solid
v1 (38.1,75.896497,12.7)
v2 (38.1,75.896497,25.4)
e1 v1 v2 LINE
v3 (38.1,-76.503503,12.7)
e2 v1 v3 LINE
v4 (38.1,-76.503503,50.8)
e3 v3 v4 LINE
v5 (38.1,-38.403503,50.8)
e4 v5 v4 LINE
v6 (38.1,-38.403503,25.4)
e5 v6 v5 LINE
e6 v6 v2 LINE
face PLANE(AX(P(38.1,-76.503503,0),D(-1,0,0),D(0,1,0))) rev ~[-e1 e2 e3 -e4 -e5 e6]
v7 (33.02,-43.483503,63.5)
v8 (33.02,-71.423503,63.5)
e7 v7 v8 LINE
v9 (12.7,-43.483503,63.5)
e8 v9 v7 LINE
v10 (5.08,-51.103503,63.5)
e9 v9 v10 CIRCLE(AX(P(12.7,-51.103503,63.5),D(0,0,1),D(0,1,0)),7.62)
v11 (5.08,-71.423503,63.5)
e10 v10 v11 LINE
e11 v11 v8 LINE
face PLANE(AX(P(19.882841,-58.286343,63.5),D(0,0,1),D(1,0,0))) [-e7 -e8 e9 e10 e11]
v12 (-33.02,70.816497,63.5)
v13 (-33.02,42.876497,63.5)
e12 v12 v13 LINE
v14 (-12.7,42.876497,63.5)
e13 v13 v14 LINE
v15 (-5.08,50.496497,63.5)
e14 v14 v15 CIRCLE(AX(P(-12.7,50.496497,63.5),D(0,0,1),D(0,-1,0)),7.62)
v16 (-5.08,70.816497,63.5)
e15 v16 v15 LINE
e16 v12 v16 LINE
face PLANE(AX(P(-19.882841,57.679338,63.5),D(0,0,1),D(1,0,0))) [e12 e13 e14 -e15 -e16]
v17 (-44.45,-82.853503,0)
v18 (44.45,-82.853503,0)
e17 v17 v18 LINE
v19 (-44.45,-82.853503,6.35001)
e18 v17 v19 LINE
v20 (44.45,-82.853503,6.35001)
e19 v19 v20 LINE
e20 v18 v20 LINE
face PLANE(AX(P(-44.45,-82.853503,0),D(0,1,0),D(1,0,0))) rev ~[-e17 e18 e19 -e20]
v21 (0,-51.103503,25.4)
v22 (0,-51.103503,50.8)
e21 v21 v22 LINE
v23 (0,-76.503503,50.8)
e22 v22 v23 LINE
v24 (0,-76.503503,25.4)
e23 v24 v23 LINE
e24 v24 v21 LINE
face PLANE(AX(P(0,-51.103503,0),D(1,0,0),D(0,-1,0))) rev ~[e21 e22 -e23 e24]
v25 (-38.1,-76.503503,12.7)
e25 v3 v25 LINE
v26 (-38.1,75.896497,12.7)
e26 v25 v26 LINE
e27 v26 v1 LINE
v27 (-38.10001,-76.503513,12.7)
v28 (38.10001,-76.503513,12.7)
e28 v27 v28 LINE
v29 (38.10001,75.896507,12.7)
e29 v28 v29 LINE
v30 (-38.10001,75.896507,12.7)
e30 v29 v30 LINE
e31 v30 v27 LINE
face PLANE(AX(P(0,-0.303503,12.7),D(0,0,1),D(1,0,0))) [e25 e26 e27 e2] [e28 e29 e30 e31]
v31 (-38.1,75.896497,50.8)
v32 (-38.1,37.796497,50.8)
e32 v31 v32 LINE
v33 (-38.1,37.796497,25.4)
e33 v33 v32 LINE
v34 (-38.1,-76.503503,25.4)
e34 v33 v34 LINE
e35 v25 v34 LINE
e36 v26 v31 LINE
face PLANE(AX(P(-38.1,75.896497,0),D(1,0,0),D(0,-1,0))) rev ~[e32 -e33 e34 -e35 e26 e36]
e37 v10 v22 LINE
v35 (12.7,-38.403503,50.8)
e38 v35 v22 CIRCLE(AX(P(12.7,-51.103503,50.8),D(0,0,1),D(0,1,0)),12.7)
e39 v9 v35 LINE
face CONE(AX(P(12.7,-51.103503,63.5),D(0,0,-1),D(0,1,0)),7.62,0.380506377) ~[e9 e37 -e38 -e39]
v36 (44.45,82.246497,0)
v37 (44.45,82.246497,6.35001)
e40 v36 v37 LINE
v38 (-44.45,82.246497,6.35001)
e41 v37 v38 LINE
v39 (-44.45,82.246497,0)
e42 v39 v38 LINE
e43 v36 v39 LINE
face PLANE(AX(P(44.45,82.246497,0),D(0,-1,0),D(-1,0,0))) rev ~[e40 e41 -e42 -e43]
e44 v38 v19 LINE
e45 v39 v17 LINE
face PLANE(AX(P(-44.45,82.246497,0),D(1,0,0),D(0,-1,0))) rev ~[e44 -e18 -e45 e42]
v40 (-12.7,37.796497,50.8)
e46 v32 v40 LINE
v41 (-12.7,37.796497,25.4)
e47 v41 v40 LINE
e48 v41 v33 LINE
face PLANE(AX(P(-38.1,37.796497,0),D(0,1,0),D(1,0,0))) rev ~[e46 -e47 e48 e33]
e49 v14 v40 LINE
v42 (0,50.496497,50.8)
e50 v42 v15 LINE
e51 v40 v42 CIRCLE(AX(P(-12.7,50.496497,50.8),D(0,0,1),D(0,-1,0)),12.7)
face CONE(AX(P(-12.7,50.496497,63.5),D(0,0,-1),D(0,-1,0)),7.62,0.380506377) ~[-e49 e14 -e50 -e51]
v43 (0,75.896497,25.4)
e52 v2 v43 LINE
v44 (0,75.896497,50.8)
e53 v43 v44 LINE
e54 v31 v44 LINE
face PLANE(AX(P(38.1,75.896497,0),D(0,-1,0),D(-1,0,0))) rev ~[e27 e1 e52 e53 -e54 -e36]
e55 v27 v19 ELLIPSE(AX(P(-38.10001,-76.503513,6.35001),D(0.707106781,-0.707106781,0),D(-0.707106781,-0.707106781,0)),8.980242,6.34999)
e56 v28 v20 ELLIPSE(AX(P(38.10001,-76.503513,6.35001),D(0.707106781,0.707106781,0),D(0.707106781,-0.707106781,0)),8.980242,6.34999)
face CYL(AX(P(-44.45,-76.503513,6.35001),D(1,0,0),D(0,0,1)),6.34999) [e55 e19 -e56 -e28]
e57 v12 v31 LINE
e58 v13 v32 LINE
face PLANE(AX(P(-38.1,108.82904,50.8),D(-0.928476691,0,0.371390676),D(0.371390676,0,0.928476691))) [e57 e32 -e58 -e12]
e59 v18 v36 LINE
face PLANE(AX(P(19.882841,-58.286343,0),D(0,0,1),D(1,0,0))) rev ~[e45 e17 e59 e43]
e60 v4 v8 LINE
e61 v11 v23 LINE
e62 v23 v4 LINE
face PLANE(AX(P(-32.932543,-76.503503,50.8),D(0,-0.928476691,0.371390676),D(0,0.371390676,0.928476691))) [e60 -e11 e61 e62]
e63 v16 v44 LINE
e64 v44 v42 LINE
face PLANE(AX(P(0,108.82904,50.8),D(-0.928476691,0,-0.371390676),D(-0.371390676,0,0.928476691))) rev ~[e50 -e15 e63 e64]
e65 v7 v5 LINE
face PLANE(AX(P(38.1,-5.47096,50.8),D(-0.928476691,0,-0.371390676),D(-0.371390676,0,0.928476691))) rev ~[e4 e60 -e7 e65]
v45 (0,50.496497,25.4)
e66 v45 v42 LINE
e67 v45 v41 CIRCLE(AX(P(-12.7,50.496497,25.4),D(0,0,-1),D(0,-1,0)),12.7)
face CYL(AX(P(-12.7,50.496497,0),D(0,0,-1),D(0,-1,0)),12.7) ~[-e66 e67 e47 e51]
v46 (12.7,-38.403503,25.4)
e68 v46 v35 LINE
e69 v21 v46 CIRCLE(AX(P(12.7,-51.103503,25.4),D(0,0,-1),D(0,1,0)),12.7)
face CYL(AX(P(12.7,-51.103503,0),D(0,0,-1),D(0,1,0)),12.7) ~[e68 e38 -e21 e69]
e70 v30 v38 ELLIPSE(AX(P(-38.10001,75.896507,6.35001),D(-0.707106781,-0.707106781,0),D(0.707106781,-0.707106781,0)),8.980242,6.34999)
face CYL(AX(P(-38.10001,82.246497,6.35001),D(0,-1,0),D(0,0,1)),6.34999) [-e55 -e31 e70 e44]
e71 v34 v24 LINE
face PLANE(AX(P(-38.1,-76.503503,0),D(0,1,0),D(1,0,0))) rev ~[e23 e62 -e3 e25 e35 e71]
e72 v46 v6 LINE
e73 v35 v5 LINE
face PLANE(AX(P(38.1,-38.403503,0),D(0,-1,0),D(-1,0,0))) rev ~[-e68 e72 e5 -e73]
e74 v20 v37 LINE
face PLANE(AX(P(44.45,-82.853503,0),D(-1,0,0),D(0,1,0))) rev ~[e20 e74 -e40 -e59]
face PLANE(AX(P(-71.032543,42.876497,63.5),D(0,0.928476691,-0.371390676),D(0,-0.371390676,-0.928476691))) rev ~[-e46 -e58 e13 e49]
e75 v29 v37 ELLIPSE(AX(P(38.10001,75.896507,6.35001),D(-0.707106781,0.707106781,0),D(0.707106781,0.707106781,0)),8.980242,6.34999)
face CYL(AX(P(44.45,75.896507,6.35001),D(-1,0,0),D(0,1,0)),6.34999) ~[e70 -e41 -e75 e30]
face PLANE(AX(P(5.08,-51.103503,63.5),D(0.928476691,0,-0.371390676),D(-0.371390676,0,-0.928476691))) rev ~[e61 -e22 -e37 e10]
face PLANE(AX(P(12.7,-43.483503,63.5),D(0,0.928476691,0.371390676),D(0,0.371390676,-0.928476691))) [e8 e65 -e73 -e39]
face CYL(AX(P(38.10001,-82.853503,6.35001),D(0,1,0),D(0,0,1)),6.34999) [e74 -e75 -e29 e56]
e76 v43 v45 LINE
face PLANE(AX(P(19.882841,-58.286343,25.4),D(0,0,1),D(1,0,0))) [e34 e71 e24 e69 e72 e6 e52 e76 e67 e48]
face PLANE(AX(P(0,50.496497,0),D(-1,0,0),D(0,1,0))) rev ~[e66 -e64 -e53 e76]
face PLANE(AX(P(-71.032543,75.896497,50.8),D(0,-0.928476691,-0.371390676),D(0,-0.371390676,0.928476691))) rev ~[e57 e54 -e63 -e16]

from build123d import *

# Parameters (mm, degrees)
F1_DEPTH     = 12.7
F2_DEPTH     = 25.4
F3_DEPTH     = 63.5
F4_R         = 6.34999
F5_T1_DEPTH  = 103.9650864339
F5_T3_DEPTH  = 58.332543217
F5_T5_DEPTH  = 58.332543217
F5_T7_DEPTH  = 103.9650864339
F5_T9_DEPTH  = 103.9650864339
F5_T11_DEPTH = 103.9650864339
F5_T13_DEPTH = 58.332543217
F5_T15_DEPTH = 58.332543217
F5_T18_ANGLE = 90
F5_T20_ANGLE = 90


# Not quite as in the source:
# - a fillet or chamfer that OpenCascade refuses, or shapes differently, is made with other operations: its cross-section is extruded or revolved along the edge and cut away or added
# - a fillet or chamfer is up to 0.001 mm smaller than in the source, because OpenCascade refuses the exact size
# - a feature of the source that left no trace in its solid (it failed there, or was rolled back) is left out


with BuildPart() as f1:
    # F0 (on Top) → F1 (new body)
    with BuildSketch(Plane.XY):
        Polygon((38.0595053568, 82.2464972734), (-38.0927510742, 82.2464972734), (-44.45, 82.2464972734), (-44.45, 76.2), (-44.45, -82.8535027266), (-38.1, -82.8535027266), (44.45, -82.8535027266), (44.45, 82.2464972734), align=None)
        Polygon((-38.1, -76.5035027266), (-38.1, 0), (-38.1, 37.7964972734), (-38.1, 75.8964972734), (0, 75.8964972734), (38.1, 75.8964972734), (38.1, -38.4035027266), (38.1, -76.5035027266), (0, -76.5035027266), align=None, mode=Mode.SUBTRACT)
        with BuildLine():
            Line((-38.1, 75.8964972734), (-38.1, 37.7964972734))
            Line((-38.1, 37.7964972734), (-12.7, 37.7964972734))
            ThreePointArc((-12.7, 37.7964972734), (-3.7197438789, 41.5162411524), (0, 50.4964972734))
            Line((0, 50.4964972734), (0, 75.8964972734))
            Line((0, 75.8964972734), (-38.1, 75.8964972734))
        make_face()
        with BuildLine():
            Line((-38.1, 37.7964972734), (-38.1, 0))
            Line((-38.1, 0), (-38.1, -76.5035027266))
            Line((-38.1, -76.5035027266), (0, -76.5035027266))
            Line((0, -76.5035027266), (0, -51.1035027266))
            ThreePointArc((0, -51.1035027266), (3.7197438789, -42.1232466055), (12.7, -38.4035027266))
            Line((12.7, -38.4035027266), (38.1, -38.4035027266))
            Line((38.1, -38.4035027266), (38.1, 75.8964972734))
            Line((38.1, 75.8964972734), (0, 75.8964972734))
            Line((0, 75.8964972734), (0, 50.4964972734))
            ThreePointArc((0, 50.4964972734), (-3.7197438789, 41.5162411524), (-12.7, 37.7964972734))
            Line((-12.7, 37.7964972734), (-38.1, 37.7964972734))
        make_face()
        with BuildLine():
            Line((0, -51.1035027266), (0, -76.5035027266))
            Line((0, -76.5035027266), (38.1, -76.5035027266))
            Line((38.1, -76.5035027266), (38.1, -38.4035027266))
            Line((38.1, -38.4035027266), (12.7, -38.4035027266))
            ThreePointArc((12.7, -38.4035027266), (3.7197438789, -42.1232466055), (0, -51.1035027266))
        make_face()
    extrude(amount=F1_DEPTH)

    # F0 (on Top) → F2 (join)
    with BuildSketch(Plane.XY):
        with BuildLine():
            Line((0, -51.1035027266), (0, -76.5035027266))
            Line((0, -76.5035027266), (38.1, -76.5035027266))
            Line((38.1, -76.5035027266), (38.1, -38.4035027266))
            Line((38.1, -38.4035027266), (12.7, -38.4035027266))
            ThreePointArc((12.7, -38.4035027266), (3.7197438789, -42.1232466055), (0, -51.1035027266))
        make_face()
        with BuildLine():
            Line((-38.1, 37.7964972734), (-38.1, 0))
            Line((-38.1, 0), (-38.1, -76.5035027266))
            Line((-38.1, -76.5035027266), (0, -76.5035027266))
            Line((0, -76.5035027266), (0, -51.1035027266))
            ThreePointArc((0, -51.1035027266), (3.7197438789, -42.1232466055), (12.7, -38.4035027266))
            Line((12.7, -38.4035027266), (38.1, -38.4035027266))
            Line((38.1, -38.4035027266), (38.1, 75.8964972734))
            Line((38.1, 75.8964972734), (0, 75.8964972734))
            Line((0, 75.8964972734), (0, 50.4964972734))
            ThreePointArc((0, 50.4964972734), (-3.7197438789, 41.5162411524), (-12.7, 37.7964972734))
            Line((-12.7, 37.7964972734), (-38.1, 37.7964972734))
        make_face()
        with BuildLine():
            Line((-38.1, 75.8964972734), (-38.1, 37.7964972734))
            Line((-38.1, 37.7964972734), (-12.7, 37.7964972734))
            ThreePointArc((-12.7, 37.7964972734), (-3.7197438789, 41.5162411524), (0, 50.4964972734))
            Line((0, 50.4964972734), (0, 75.8964972734))
            Line((0, 75.8964972734), (-38.1, 75.8964972734))
        make_face()
    extrude(amount=F2_DEPTH)

    # F0 (on Top) → F3 (join)
    with BuildSketch(Plane.XY):
        with BuildLine():
            Line((0, -51.1035027266), (0, -76.5035027266))
            Line((0, -76.5035027266), (38.1, -76.5035027266))
            Line((38.1, -76.5035027266), (38.1, -38.4035027266))
            Line((38.1, -38.4035027266), (12.7, -38.4035027266))
            ThreePointArc((12.7, -38.4035027266), (3.7197438789, -42.1232466055), (0, -51.1035027266))
        make_face()
        with BuildLine():
            Line((-38.1, 75.8964972734), (-38.1, 37.7964972734))
            Line((-38.1, 37.7964972734), (-12.7, 37.7964972734))
            ThreePointArc((-12.7, 37.7964972734), (-3.7197438789, 41.5162411524), (0, 50.4964972734))
            Line((0, 50.4964972734), (0, 75.8964972734))
            Line((0, 75.8964972734), (-38.1, 75.8964972734))
        make_face()
    extrude(amount=F3_DEPTH)

    # F4 (radius 6.35 in the source; OpenCascade refuses exactly that, so slightly less here)
    f4_edges = [f1.edges().sort_by_distance(p)[0] for p in [
        (-44.45, -0.303503, 12.7),
        (0, -82.853503, 12.7),
        (44.45, -0.303503, 12.7),
        (0, 82.246497, 12.7),
    ]]
    fillet(f4_edges, radius=F4_R)

    # F5: chamfer of 5.08 x 12.7 on 10 edges, made by hand

    # F5_s2 → F5_t1 (cut)
    with BuildSketch(Plane.XZ.offset(5.4709595096)):
        Polygon((38.1, 50.8), (33.02, 63.5), (38.1, 63.5), align=None)
    extrude(amount=F5_T1_DEPTH, mode=Mode.SUBTRACT)

    # F5_s4 → F5_t3 (cut)
    with BuildSketch(Plane.YZ.offset(12.7)):
        Polygon((-43.4835027266, 63.5), (-38.4035027266, 50.8), (-38.4035027266, 63.5), align=None)
    extrude(amount=F5_T3_DEPTH, mode=Mode.SUBTRACT)

    # F5_s6 → F5_t5 (cut)
    with BuildSketch(Plane.XZ.offset(51.1035027266)):
        Polygon((5.08, 63.5), (0, 50.8), (0, 63.5), align=None)
    extrude(amount=F5_T5_DEPTH, mode=Mode.SUBTRACT)

    # F5_s8 → F5_t7 (cut)
    with BuildSketch(Plane.YZ.offset(-32.932543217)):
        Polygon((-76.5035027266, 50.8), (-71.4235027266, 63.5), (-76.5035027266, 63.5), align=None)
    extrude(amount=F5_T7_DEPTH, mode=Mode.SUBTRACT)

    # F5_s10 → F5_t9 (cut)
    with BuildSketch(Plane.YZ.offset(-71.032543217)):
        Polygon((75.8964972734, 50.8), (70.8164972734, 63.5), (75.8964972734, 63.5), align=None)
    extrude(amount=F5_T9_DEPTH, mode=Mode.SUBTRACT)

    # F5_s12 → F5_t11 (cut)
    with BuildSketch(Plane.XZ.offset(-108.8290404904)):
        Polygon((-38.1, 50.8), (-33.02, 63.5), (-38.1, 63.5), align=None)
    extrude(amount=F5_T11_DEPTH, mode=Mode.SUBTRACT)

    # F5_s14 → F5_t13 (cut)
    with BuildSketch(Plane.XZ.offset(-108.8290404904)):
        Polygon((0, 50.8), (-5.08, 63.5), (0, 63.5), align=None)
    extrude(amount=F5_T13_DEPTH, mode=Mode.SUBTRACT)

    # F5_s16 → F5_t15 (cut)
    with BuildSketch(Plane.YZ.offset(-71.032543217)):
        Polygon((42.8764972734, 63.5), (37.7964972734, 50.8), (37.7964972734, 63.5), align=None)
    extrude(amount=F5_T15_DEPTH, mode=Mode.SUBTRACT)

    # F5_s17 → F5_t18 (revolve, cut)
    with BuildSketch(Plane.YZ.offset(12.7)):
        Polygon((-43.4835027266, 63.5), (-38.4035027266, 50.8), (-38.4035027266, 63.5), align=None)
    revolve(axis=Axis((12.7, -51.1035027266, 63.5), (0, 0, 1)), revolution_arc=F5_T18_ANGLE, mode=Mode.SUBTRACT)

    # F5_s19 → F5_t20 (revolve, cut)
    with BuildSketch(Plane.YZ.offset(-12.7)):
        Polygon((42.8764972734, 63.5), (37.7964972734, 50.8), (37.7964972734, 63.5), align=None)
    revolve(axis=Axis((-12.7, 50.4964972734, 63.5), (0, 0, 1)), revolution_arc=F5_T20_ANGLE, mode=Mode.SUBTRACT)


solid = f1.part
